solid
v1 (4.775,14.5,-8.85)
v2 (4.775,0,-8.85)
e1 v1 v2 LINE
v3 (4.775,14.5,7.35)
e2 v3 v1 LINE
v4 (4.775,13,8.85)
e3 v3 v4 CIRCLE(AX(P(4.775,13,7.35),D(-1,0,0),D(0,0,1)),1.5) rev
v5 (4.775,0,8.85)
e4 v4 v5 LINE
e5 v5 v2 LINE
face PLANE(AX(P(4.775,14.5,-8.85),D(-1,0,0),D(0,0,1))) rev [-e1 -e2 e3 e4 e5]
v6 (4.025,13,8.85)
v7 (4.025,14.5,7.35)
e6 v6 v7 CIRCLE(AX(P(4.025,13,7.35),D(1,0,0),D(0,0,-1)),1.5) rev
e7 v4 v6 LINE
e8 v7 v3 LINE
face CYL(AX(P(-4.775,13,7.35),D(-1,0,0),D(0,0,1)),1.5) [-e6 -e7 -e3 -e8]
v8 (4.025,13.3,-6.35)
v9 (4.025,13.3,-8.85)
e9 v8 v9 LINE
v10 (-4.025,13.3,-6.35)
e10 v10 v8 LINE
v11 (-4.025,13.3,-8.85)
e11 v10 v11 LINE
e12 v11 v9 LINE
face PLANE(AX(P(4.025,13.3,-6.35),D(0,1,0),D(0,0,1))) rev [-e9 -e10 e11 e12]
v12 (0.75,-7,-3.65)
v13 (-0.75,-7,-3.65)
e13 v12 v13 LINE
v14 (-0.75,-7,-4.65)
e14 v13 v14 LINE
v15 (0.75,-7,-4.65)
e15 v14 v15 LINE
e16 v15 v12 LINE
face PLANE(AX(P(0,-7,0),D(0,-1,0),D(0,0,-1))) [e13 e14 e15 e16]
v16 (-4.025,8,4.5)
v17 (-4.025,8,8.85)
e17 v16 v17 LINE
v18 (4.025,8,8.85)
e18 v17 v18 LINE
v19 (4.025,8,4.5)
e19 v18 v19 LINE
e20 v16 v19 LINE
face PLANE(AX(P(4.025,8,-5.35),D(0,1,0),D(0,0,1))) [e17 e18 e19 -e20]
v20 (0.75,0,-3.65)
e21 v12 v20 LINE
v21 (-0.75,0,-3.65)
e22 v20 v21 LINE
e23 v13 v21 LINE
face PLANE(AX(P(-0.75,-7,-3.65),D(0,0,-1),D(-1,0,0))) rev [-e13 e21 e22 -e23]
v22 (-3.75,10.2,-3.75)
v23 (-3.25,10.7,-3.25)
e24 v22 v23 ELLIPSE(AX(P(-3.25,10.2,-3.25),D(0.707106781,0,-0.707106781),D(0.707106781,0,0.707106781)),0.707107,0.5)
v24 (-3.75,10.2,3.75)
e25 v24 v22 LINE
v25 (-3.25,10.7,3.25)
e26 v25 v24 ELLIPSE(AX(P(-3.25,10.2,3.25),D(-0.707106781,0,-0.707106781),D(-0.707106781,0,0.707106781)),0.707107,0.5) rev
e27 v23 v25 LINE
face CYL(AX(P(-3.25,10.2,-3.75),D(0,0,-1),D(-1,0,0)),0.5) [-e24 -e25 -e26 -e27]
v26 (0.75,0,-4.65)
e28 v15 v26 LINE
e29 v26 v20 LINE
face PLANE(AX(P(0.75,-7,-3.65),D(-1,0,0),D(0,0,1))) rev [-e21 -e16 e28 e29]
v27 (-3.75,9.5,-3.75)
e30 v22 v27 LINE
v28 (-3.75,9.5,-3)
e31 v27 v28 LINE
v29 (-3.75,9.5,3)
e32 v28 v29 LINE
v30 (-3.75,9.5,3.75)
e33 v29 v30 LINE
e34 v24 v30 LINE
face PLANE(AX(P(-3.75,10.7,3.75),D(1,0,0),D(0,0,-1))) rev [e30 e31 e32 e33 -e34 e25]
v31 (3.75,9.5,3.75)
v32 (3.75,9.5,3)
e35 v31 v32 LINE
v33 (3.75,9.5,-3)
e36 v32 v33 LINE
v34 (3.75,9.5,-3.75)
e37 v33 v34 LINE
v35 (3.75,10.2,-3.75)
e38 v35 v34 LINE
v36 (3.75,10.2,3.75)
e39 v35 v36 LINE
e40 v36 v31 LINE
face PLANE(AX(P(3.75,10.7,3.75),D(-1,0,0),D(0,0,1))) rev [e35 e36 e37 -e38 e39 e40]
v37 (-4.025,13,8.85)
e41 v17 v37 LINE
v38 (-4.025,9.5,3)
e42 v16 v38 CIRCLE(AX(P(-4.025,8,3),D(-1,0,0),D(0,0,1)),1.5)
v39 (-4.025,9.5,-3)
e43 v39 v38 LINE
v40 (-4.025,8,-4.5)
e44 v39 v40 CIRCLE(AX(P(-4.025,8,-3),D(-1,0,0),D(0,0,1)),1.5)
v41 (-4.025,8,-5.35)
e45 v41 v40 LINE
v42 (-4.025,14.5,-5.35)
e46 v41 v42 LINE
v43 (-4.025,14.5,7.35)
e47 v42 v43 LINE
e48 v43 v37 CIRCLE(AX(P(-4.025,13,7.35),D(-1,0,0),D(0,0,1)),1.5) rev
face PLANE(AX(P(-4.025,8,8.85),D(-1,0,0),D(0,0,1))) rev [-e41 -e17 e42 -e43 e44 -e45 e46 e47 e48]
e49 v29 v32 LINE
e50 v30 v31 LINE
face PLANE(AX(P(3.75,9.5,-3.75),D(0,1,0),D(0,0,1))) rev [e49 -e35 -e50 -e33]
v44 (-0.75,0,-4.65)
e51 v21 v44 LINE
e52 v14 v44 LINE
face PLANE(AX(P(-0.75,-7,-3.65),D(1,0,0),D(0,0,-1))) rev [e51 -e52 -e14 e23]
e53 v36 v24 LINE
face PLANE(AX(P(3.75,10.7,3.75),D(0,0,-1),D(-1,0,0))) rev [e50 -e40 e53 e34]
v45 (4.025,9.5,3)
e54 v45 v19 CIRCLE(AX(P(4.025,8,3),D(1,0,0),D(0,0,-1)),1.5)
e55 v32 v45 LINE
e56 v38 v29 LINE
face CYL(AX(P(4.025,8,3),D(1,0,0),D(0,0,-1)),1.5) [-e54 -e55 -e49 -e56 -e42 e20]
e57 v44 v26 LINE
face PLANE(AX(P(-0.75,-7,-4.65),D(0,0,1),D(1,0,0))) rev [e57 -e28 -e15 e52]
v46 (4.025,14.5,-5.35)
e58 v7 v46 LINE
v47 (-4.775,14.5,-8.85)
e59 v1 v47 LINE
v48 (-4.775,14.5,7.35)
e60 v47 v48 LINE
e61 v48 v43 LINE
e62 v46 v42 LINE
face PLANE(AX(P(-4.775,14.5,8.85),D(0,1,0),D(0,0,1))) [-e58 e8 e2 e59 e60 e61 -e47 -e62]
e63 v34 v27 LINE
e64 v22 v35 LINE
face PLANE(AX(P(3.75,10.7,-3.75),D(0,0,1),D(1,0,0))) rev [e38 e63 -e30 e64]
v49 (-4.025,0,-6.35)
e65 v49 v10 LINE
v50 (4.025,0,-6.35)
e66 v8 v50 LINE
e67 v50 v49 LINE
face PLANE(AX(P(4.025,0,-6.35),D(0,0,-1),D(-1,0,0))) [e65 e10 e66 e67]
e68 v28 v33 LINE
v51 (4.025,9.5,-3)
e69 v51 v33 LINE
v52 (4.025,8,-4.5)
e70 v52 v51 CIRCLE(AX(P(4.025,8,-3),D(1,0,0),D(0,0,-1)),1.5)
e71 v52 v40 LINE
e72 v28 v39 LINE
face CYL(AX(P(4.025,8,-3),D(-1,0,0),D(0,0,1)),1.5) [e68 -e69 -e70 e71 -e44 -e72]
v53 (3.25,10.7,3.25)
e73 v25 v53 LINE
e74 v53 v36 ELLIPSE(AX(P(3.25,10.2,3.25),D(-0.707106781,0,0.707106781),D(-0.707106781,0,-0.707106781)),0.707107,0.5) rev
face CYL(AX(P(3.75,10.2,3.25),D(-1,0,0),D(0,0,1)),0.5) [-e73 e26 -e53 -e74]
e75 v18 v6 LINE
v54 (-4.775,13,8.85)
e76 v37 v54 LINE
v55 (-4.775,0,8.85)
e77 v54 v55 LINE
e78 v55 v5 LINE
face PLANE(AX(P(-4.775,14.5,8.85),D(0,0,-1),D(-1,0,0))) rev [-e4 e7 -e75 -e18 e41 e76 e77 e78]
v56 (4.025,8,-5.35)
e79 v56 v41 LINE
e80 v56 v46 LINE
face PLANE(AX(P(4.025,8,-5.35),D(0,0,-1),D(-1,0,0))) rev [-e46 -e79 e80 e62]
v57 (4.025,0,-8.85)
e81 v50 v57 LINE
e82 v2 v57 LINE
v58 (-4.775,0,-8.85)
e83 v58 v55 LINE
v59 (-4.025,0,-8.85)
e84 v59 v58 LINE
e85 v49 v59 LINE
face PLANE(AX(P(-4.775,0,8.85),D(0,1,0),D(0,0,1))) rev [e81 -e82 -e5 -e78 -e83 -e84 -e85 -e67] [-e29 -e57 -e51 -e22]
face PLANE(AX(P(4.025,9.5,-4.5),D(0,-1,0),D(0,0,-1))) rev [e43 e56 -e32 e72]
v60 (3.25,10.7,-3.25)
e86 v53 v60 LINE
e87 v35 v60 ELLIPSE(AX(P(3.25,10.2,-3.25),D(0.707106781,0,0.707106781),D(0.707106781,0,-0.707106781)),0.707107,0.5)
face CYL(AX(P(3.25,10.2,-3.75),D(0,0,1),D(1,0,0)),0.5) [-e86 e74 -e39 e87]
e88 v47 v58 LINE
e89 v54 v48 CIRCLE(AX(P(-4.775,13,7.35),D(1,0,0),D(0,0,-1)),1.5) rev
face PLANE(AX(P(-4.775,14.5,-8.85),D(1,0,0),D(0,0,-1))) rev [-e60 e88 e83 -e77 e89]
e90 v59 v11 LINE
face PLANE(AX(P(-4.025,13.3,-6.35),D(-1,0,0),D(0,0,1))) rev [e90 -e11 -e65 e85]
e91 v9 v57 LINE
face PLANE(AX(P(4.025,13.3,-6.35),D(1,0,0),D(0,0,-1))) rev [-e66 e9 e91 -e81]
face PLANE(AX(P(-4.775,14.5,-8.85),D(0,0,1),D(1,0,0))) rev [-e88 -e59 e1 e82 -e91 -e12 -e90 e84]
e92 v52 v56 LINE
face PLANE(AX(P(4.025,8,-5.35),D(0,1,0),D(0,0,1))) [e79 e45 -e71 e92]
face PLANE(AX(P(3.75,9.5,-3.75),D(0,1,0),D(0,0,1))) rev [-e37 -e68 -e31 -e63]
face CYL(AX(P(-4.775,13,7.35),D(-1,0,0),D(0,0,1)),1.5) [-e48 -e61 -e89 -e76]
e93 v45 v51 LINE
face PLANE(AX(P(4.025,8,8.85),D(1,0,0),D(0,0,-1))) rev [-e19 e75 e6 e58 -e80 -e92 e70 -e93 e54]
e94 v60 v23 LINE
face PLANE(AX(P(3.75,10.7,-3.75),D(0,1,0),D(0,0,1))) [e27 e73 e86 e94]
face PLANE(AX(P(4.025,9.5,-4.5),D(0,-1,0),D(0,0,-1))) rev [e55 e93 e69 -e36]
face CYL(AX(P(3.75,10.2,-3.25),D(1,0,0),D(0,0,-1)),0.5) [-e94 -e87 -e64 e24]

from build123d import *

# Parameters (mm, degrees)
SKETCH_1_W          = 9.55
SKETCH_1_H          = 17.7
EXTRUDE_1_DEPTH     = 14.5
SKETCH_2_W          = 8.05
SKETCH_2_H          = 14.2
CUT_EXTRUDE_1_DEPTH = 6.5
SKETCH_5_W          = 8.05
SKETCH_5_H          = 13.3
CUT_EXTRUDE_4_DEPTH = 2.5
FILLET_1_R          = 1.5
SKETCH_8_W          = 8.05
SKETCH_8_H          = 9
EXTRUDE_1320_DEPTH  = 1.5
FILLET_2_R          = 1.5
SKETCH_10_W         = 7.5
SKETCH_10_H         = 7.5
EXTRUDE_4_DEPTH     = 1.2
FILLET_4_R          = 0.5
SKETCH_11_W         = 1.5
SKETCH_11_H         = 1
EXTRUDE_1_2_DEPTH   = 7


with BuildPart() as part:
    # 草图1 → Extrude 1 (new body)
    with BuildSketch(Plane(origin=(0, 0, 0), x_dir=(1, 0, 0), z_dir=(0, 1, 0))):
        Rectangle(SKETCH_1_W, SKETCH_1_H)
    extrude(amount=EXTRUDE_1_DEPTH)

    # 草图2 → 切除-拉伸1 (cut)
    with BuildSketch(Plane(origin=(0, 14.5, 0), x_dir=(-1, 0, 0), z_dir=(0, 1, 0))):
        with Locations((0, 1.75)):
            Rectangle(SKETCH_2_W, SKETCH_2_H)
    extrude(amount=-CUT_EXTRUDE_1_DEPTH, mode=Mode.SUBTRACT)

    # 草图5 → 切除-拉伸4 (cut)
    with BuildSketch(Plane(origin=(0, 0, -8.85), x_dir=(-1, 0, 0), z_dir=(0, 0, -1))):
        with Locations((0, 6.65)):
            Rectangle(SKETCH_5_W, SKETCH_5_H)
    extrude(amount=-CUT_EXTRUDE_4_DEPTH, mode=Mode.SUBTRACT)

    # 圆角1
    fillet_1_edges = [part.edges().sort_by_distance(p)[0] for p in [
        (4.4, 14.5, 8.85),
        (-4.4, 14.5, 8.85),
    ]]
    fillet(fillet_1_edges, radius=FILLET_1_R)

    # 草图8 → Extrude 1320 (add)
    with BuildSketch(Plane(origin=(0, 8, 0), x_dir=(-1, 0, 0), z_dir=(0, 1, 0))):
        Rectangle(SKETCH_8_W, SKETCH_8_H)
    extrude(amount=EXTRUDE_1320_DEPTH)

    # 圆角2
    fillet_2_edges = [part.edges().sort_by_distance(p)[0] for p in [
        (0, 9.5, -4.5),
        (0, 9.5, 4.5),
    ]]
    fillet(fillet_2_edges, radius=FILLET_2_R - 0.0001)  # a hair under: the kernel refuses the full size

    # 草图10 → 拉伸4 (add)
    with BuildSketch(Plane(origin=(0, 9.5, 0), x_dir=(-1, 0, 0), z_dir=(0, 1, 0))):
        Rectangle(SKETCH_10_W, SKETCH_10_H)
    extrude(amount=EXTRUDE_4_DEPTH)

    # 圆角4
    fillet_4_edges = [part.edges().sort_by_distance(p)[0] for p in [
        (3.75, 10.7, 0),
        (0, 10.7, -3.75),
        (-3.75, 10.7, 0),
        (0, 10.7, 3.75),
    ]]
    fillet(fillet_4_edges, radius=FILLET_4_R)

    # 草图11 → Extrude 1 2 (add)
    with BuildSketch(Plane.XZ):
        with Locations((0, -4.15)):
            Rectangle(SKETCH_11_W, SKETCH_11_H)
    extrude(amount=EXTRUDE_1_2_DEPTH)


solid = part.part
